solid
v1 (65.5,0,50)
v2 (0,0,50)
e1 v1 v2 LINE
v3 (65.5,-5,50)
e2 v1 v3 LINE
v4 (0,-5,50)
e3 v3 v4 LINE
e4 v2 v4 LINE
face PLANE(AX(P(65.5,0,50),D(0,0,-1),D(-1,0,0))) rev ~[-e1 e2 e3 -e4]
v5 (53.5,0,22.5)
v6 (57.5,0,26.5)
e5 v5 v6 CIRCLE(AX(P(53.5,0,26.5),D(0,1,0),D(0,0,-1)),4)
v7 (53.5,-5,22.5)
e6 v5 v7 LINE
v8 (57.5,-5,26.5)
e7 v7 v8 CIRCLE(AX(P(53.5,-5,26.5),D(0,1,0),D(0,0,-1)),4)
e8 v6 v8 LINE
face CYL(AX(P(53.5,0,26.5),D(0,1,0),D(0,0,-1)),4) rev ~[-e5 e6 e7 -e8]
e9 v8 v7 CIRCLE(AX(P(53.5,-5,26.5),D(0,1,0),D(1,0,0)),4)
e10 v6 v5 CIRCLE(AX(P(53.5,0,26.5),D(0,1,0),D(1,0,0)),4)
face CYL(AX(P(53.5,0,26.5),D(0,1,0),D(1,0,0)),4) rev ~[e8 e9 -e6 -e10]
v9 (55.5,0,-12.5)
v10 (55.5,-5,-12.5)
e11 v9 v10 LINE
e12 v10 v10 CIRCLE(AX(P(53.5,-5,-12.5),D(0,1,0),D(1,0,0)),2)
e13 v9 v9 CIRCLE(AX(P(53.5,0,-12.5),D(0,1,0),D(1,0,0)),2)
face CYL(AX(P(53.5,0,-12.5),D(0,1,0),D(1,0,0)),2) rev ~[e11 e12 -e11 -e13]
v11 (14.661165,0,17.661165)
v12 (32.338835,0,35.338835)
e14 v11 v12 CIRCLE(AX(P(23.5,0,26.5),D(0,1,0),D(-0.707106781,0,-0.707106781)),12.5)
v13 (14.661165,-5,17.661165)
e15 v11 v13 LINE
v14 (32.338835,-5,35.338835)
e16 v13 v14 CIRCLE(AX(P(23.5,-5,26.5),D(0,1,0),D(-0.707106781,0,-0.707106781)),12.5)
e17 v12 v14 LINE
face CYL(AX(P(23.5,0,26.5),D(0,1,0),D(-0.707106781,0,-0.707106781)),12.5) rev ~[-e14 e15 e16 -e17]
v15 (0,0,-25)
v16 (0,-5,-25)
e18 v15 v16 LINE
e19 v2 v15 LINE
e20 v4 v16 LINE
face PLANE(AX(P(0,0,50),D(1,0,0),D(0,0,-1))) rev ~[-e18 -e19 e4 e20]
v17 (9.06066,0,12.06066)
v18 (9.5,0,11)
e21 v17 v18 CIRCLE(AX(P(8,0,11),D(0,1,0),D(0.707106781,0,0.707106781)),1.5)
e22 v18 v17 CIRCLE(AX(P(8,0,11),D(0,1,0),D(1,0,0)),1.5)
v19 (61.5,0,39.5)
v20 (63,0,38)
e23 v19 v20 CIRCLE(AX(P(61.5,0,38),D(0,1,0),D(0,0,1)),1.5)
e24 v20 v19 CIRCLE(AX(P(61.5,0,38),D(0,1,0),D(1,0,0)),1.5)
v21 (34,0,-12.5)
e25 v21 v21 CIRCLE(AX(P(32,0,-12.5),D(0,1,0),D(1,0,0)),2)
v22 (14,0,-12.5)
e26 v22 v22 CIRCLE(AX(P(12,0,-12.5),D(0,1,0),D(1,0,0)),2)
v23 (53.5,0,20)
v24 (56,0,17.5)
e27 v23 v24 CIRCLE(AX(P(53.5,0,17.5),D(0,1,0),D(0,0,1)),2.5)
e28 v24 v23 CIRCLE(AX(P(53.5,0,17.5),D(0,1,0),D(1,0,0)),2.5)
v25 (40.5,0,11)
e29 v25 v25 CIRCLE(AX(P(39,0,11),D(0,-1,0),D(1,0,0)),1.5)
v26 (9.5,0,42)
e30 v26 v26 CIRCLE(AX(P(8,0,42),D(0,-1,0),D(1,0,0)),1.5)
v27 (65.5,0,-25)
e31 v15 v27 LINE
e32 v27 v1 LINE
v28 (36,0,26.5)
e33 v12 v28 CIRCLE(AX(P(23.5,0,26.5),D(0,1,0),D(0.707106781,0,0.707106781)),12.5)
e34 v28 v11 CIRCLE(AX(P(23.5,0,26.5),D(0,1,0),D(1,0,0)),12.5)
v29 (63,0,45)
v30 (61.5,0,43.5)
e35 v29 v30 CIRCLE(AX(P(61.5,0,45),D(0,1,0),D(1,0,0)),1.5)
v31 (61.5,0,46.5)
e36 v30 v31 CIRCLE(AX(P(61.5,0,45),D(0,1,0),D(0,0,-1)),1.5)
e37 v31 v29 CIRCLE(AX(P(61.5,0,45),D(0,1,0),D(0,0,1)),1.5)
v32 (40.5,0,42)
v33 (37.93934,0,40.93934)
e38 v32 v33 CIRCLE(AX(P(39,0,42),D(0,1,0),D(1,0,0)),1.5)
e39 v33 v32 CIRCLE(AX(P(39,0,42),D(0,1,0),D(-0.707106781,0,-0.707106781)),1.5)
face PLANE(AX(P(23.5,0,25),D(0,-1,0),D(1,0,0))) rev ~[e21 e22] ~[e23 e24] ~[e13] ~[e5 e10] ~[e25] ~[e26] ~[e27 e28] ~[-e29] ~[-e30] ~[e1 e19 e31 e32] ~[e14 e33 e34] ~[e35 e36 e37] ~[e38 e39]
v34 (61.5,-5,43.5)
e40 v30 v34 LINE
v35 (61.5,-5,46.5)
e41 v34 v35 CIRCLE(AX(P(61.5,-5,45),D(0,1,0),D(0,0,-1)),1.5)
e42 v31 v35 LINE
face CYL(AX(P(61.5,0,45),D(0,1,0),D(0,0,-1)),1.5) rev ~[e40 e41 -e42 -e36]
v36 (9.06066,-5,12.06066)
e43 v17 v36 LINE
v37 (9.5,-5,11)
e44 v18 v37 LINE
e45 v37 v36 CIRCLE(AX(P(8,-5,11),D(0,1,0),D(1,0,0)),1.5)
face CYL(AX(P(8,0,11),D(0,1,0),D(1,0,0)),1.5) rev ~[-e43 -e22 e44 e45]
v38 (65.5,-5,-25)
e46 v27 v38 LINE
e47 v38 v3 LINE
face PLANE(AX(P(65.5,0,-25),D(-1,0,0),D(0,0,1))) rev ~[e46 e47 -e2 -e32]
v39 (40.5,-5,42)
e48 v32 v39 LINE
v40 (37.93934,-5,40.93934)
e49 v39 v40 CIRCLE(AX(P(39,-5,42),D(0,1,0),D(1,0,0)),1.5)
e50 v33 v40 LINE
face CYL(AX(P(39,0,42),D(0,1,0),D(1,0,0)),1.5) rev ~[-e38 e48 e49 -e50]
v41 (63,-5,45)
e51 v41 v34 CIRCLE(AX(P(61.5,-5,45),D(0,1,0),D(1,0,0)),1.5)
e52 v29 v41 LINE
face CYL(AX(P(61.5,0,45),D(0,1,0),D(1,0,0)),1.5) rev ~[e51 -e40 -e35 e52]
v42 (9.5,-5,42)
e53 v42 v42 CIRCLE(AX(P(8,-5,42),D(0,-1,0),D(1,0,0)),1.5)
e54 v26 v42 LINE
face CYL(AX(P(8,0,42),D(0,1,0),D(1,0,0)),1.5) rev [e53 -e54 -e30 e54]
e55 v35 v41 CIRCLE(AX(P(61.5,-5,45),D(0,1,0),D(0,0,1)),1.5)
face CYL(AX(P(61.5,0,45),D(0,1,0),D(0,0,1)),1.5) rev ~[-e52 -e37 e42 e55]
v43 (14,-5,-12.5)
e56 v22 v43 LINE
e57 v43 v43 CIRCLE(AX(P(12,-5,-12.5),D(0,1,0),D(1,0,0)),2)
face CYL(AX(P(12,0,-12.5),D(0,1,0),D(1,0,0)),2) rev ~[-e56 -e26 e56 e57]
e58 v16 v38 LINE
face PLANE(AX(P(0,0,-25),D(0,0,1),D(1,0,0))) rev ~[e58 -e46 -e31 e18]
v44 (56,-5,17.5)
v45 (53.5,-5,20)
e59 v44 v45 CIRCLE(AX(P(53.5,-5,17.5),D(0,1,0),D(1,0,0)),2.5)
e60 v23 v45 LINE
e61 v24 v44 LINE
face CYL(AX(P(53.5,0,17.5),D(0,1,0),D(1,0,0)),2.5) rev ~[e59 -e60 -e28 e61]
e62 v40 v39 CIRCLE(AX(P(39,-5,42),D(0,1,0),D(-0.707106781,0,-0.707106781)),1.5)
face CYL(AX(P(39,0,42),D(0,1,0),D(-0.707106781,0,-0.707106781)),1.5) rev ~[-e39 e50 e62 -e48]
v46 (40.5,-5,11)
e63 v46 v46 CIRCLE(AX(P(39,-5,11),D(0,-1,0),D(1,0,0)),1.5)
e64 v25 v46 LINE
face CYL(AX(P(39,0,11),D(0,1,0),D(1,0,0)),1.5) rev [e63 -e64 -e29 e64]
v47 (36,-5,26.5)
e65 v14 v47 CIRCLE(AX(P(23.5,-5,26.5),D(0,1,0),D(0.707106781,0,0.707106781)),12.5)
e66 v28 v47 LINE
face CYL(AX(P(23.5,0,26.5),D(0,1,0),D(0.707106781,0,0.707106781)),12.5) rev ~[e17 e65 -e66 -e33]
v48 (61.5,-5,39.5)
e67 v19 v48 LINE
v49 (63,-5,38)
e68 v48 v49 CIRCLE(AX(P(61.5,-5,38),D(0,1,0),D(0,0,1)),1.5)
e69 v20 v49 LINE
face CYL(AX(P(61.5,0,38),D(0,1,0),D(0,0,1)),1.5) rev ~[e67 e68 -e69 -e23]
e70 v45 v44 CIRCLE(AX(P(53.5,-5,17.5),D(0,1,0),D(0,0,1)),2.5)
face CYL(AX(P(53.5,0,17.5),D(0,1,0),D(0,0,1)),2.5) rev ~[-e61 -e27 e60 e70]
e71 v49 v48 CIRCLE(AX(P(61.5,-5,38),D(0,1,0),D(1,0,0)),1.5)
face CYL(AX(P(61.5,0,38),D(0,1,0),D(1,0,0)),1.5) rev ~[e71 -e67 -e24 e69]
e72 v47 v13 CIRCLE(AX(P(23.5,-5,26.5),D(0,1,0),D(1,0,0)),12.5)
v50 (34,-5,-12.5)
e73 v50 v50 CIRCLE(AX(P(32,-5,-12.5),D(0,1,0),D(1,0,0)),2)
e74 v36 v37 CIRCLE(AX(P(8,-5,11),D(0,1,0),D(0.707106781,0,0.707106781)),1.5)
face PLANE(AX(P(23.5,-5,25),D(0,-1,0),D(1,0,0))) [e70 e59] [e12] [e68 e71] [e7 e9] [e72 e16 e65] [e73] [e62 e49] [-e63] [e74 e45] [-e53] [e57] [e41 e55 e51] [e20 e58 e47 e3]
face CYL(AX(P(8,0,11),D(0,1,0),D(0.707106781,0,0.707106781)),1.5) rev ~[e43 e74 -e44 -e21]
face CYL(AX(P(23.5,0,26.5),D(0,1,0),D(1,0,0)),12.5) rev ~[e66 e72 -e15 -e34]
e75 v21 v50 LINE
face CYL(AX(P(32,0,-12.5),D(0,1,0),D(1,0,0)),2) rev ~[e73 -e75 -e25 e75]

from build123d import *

# Parameters (mm, degrees)
F0_W     = 47
F0_H     = 50
F0_R     = 1.5
F1_DEPTH = 5


# Not quite as in the source:
# - a feature names something its author has since deleted; it is built from what else it names


with BuildPart() as f1:
    # F0 (on Front) → F1 (new body)
    with BuildSketch(Plane.XZ):
        with Locations((23.5, 25)):
            Rectangle(F0_W, F0_H)
        with BuildLine():
            ThreePointArc((9.5, 11), (6.6141807012, 10.4259748515), (9.0606601718, 12.0606601718))
            ThreePointArc((9.0606601718, 12.0606601718), (9.3858192988, 11.5740251485), (9.5, 11))
        make_face(mode=Mode.SUBTRACT)
        with Locations((39, 11)):
            Circle(F0_R, mode=Mode.SUBTRACT)
        with BuildLine():
            ThreePointArc((14.6611652352, 17.6611652352), (14.6611652352, 35.3388347648), (32.3388347648, 35.3388347648))
            ThreePointArc((32.3388347648, 35.3388347648), (35.0484941564, 31.2835429046), (36, 26.5))
            ThreePointArc((36, 26.5), (28.2835429046, 14.9515058436), (14.6611652352, 17.6611652352))
        make_face(mode=Mode.SUBTRACT)
        with Locations((8, 42)):
            Circle(F0_R, mode=Mode.SUBTRACT)
        with BuildLine():
            ThreePointArc((37.9393398282, 40.9393398282), (38.4259748515, 43.3858192988), (40.5, 42))
            ThreePointArc((40.5, 42), (39.5740251485, 40.6141807012), (37.9393398282, 40.9393398282))
        make_face(mode=Mode.SUBTRACT)
        with BuildLine():
            Line((47, 50), (47, 0))
            Line((47, 0), (47, -12.5))
            Line((47, -12.5), (51.5, -12.5))
            ThreePointArc((51.5, -12.5), (53.5, -10.5), (55.5, -12.5))
            Line((55.5, -12.5), (65.5, -12.5))
            Line((65.5, -12.5), (65.5, 26.5))
            Line((65.5, 26.5), (65.5, 50))
            Line((65.5, 50), (61.5, 50))
            Line((61.5, 50), (47, 50))
        make_face()
        with BuildLine():
            ThreePointArc((56, 17.5), (51.732233047, 15.732233047), (53.5, 20))
            ThreePointArc((53.5, 20), (55.267766953, 19.267766953), (56, 17.5))
        make_face(mode=Mode.SUBTRACT)
        with BuildLine():
            ThreePointArc((53.5, 22.5), (50.6715728753, 29.3284271247), (57.5, 26.5))
            ThreePointArc((57.5, 26.5), (56.3284271247, 23.6715728753), (53.5, 22.5))
        make_face(mode=Mode.SUBTRACT)
        with BuildLine():
            ThreePointArc((63, 38), (60.4393398282, 36.9393398282), (61.5, 39.5))
            ThreePointArc((61.5, 39.5), (62.5606601718, 39.0606601718), (63, 38))
        make_face(mode=Mode.SUBTRACT)
        with BuildLine():
            ThreePointArc((61.5, 43.5), (60, 45), (61.5, 46.5))
            ThreePointArc((61.5, 46.5), (62.5606601718, 46.0606601718), (63, 45))
            ThreePointArc((63, 45), (62.5606601718, 43.9393398282), (61.5, 43.5))
        make_face(mode=Mode.SUBTRACT)
        with BuildLine():
            Line((47, 0), (0, 0))
            Line((0, 0), (0, -12.5))
            Line((0, -12.5), (10, -12.5))
            ThreePointArc((10, -12.5), (12, -10.5), (14, -12.5))
            Line((14, -12.5), (30, -12.5))
            ThreePointArc((30, -12.5), (32, -10.5), (34, -12.5))
            Line((34, -12.5), (47, -12.5))
            Line((47, -12.5), (47, 0))
        make_face()
        with BuildLine():
            Line((10, -12.5), (0, -12.5))
            Line((0, -12.5), (0, -25))
            Line((0, -25), (47, -25))
            Line((47, -25), (47, -12.5))
            Line((47, -12.5), (34, -12.5))
            ThreePointArc((34, -12.5), (32, -14.5), (30, -12.5))
            Line((30, -12.5), (14, -12.5))
            ThreePointArc((14, -12.5), (12, -14.5), (10, -12.5))
        make_face()
        with BuildLine():
            Line((51.5, -12.5), (47, -12.5))
            Line((47, -12.5), (47, -25))
            Line((47, -25), (65.5, -25))
            Line((65.5, -25), (65.5, -12.5))
            Line((65.5, -12.5), (55.5, -12.5))
            ThreePointArc((55.5, -12.5), (53.5, -14.5), (51.5, -12.5))
        make_face()
    extrude(amount=F1_DEPTH)


solid = f1.part
